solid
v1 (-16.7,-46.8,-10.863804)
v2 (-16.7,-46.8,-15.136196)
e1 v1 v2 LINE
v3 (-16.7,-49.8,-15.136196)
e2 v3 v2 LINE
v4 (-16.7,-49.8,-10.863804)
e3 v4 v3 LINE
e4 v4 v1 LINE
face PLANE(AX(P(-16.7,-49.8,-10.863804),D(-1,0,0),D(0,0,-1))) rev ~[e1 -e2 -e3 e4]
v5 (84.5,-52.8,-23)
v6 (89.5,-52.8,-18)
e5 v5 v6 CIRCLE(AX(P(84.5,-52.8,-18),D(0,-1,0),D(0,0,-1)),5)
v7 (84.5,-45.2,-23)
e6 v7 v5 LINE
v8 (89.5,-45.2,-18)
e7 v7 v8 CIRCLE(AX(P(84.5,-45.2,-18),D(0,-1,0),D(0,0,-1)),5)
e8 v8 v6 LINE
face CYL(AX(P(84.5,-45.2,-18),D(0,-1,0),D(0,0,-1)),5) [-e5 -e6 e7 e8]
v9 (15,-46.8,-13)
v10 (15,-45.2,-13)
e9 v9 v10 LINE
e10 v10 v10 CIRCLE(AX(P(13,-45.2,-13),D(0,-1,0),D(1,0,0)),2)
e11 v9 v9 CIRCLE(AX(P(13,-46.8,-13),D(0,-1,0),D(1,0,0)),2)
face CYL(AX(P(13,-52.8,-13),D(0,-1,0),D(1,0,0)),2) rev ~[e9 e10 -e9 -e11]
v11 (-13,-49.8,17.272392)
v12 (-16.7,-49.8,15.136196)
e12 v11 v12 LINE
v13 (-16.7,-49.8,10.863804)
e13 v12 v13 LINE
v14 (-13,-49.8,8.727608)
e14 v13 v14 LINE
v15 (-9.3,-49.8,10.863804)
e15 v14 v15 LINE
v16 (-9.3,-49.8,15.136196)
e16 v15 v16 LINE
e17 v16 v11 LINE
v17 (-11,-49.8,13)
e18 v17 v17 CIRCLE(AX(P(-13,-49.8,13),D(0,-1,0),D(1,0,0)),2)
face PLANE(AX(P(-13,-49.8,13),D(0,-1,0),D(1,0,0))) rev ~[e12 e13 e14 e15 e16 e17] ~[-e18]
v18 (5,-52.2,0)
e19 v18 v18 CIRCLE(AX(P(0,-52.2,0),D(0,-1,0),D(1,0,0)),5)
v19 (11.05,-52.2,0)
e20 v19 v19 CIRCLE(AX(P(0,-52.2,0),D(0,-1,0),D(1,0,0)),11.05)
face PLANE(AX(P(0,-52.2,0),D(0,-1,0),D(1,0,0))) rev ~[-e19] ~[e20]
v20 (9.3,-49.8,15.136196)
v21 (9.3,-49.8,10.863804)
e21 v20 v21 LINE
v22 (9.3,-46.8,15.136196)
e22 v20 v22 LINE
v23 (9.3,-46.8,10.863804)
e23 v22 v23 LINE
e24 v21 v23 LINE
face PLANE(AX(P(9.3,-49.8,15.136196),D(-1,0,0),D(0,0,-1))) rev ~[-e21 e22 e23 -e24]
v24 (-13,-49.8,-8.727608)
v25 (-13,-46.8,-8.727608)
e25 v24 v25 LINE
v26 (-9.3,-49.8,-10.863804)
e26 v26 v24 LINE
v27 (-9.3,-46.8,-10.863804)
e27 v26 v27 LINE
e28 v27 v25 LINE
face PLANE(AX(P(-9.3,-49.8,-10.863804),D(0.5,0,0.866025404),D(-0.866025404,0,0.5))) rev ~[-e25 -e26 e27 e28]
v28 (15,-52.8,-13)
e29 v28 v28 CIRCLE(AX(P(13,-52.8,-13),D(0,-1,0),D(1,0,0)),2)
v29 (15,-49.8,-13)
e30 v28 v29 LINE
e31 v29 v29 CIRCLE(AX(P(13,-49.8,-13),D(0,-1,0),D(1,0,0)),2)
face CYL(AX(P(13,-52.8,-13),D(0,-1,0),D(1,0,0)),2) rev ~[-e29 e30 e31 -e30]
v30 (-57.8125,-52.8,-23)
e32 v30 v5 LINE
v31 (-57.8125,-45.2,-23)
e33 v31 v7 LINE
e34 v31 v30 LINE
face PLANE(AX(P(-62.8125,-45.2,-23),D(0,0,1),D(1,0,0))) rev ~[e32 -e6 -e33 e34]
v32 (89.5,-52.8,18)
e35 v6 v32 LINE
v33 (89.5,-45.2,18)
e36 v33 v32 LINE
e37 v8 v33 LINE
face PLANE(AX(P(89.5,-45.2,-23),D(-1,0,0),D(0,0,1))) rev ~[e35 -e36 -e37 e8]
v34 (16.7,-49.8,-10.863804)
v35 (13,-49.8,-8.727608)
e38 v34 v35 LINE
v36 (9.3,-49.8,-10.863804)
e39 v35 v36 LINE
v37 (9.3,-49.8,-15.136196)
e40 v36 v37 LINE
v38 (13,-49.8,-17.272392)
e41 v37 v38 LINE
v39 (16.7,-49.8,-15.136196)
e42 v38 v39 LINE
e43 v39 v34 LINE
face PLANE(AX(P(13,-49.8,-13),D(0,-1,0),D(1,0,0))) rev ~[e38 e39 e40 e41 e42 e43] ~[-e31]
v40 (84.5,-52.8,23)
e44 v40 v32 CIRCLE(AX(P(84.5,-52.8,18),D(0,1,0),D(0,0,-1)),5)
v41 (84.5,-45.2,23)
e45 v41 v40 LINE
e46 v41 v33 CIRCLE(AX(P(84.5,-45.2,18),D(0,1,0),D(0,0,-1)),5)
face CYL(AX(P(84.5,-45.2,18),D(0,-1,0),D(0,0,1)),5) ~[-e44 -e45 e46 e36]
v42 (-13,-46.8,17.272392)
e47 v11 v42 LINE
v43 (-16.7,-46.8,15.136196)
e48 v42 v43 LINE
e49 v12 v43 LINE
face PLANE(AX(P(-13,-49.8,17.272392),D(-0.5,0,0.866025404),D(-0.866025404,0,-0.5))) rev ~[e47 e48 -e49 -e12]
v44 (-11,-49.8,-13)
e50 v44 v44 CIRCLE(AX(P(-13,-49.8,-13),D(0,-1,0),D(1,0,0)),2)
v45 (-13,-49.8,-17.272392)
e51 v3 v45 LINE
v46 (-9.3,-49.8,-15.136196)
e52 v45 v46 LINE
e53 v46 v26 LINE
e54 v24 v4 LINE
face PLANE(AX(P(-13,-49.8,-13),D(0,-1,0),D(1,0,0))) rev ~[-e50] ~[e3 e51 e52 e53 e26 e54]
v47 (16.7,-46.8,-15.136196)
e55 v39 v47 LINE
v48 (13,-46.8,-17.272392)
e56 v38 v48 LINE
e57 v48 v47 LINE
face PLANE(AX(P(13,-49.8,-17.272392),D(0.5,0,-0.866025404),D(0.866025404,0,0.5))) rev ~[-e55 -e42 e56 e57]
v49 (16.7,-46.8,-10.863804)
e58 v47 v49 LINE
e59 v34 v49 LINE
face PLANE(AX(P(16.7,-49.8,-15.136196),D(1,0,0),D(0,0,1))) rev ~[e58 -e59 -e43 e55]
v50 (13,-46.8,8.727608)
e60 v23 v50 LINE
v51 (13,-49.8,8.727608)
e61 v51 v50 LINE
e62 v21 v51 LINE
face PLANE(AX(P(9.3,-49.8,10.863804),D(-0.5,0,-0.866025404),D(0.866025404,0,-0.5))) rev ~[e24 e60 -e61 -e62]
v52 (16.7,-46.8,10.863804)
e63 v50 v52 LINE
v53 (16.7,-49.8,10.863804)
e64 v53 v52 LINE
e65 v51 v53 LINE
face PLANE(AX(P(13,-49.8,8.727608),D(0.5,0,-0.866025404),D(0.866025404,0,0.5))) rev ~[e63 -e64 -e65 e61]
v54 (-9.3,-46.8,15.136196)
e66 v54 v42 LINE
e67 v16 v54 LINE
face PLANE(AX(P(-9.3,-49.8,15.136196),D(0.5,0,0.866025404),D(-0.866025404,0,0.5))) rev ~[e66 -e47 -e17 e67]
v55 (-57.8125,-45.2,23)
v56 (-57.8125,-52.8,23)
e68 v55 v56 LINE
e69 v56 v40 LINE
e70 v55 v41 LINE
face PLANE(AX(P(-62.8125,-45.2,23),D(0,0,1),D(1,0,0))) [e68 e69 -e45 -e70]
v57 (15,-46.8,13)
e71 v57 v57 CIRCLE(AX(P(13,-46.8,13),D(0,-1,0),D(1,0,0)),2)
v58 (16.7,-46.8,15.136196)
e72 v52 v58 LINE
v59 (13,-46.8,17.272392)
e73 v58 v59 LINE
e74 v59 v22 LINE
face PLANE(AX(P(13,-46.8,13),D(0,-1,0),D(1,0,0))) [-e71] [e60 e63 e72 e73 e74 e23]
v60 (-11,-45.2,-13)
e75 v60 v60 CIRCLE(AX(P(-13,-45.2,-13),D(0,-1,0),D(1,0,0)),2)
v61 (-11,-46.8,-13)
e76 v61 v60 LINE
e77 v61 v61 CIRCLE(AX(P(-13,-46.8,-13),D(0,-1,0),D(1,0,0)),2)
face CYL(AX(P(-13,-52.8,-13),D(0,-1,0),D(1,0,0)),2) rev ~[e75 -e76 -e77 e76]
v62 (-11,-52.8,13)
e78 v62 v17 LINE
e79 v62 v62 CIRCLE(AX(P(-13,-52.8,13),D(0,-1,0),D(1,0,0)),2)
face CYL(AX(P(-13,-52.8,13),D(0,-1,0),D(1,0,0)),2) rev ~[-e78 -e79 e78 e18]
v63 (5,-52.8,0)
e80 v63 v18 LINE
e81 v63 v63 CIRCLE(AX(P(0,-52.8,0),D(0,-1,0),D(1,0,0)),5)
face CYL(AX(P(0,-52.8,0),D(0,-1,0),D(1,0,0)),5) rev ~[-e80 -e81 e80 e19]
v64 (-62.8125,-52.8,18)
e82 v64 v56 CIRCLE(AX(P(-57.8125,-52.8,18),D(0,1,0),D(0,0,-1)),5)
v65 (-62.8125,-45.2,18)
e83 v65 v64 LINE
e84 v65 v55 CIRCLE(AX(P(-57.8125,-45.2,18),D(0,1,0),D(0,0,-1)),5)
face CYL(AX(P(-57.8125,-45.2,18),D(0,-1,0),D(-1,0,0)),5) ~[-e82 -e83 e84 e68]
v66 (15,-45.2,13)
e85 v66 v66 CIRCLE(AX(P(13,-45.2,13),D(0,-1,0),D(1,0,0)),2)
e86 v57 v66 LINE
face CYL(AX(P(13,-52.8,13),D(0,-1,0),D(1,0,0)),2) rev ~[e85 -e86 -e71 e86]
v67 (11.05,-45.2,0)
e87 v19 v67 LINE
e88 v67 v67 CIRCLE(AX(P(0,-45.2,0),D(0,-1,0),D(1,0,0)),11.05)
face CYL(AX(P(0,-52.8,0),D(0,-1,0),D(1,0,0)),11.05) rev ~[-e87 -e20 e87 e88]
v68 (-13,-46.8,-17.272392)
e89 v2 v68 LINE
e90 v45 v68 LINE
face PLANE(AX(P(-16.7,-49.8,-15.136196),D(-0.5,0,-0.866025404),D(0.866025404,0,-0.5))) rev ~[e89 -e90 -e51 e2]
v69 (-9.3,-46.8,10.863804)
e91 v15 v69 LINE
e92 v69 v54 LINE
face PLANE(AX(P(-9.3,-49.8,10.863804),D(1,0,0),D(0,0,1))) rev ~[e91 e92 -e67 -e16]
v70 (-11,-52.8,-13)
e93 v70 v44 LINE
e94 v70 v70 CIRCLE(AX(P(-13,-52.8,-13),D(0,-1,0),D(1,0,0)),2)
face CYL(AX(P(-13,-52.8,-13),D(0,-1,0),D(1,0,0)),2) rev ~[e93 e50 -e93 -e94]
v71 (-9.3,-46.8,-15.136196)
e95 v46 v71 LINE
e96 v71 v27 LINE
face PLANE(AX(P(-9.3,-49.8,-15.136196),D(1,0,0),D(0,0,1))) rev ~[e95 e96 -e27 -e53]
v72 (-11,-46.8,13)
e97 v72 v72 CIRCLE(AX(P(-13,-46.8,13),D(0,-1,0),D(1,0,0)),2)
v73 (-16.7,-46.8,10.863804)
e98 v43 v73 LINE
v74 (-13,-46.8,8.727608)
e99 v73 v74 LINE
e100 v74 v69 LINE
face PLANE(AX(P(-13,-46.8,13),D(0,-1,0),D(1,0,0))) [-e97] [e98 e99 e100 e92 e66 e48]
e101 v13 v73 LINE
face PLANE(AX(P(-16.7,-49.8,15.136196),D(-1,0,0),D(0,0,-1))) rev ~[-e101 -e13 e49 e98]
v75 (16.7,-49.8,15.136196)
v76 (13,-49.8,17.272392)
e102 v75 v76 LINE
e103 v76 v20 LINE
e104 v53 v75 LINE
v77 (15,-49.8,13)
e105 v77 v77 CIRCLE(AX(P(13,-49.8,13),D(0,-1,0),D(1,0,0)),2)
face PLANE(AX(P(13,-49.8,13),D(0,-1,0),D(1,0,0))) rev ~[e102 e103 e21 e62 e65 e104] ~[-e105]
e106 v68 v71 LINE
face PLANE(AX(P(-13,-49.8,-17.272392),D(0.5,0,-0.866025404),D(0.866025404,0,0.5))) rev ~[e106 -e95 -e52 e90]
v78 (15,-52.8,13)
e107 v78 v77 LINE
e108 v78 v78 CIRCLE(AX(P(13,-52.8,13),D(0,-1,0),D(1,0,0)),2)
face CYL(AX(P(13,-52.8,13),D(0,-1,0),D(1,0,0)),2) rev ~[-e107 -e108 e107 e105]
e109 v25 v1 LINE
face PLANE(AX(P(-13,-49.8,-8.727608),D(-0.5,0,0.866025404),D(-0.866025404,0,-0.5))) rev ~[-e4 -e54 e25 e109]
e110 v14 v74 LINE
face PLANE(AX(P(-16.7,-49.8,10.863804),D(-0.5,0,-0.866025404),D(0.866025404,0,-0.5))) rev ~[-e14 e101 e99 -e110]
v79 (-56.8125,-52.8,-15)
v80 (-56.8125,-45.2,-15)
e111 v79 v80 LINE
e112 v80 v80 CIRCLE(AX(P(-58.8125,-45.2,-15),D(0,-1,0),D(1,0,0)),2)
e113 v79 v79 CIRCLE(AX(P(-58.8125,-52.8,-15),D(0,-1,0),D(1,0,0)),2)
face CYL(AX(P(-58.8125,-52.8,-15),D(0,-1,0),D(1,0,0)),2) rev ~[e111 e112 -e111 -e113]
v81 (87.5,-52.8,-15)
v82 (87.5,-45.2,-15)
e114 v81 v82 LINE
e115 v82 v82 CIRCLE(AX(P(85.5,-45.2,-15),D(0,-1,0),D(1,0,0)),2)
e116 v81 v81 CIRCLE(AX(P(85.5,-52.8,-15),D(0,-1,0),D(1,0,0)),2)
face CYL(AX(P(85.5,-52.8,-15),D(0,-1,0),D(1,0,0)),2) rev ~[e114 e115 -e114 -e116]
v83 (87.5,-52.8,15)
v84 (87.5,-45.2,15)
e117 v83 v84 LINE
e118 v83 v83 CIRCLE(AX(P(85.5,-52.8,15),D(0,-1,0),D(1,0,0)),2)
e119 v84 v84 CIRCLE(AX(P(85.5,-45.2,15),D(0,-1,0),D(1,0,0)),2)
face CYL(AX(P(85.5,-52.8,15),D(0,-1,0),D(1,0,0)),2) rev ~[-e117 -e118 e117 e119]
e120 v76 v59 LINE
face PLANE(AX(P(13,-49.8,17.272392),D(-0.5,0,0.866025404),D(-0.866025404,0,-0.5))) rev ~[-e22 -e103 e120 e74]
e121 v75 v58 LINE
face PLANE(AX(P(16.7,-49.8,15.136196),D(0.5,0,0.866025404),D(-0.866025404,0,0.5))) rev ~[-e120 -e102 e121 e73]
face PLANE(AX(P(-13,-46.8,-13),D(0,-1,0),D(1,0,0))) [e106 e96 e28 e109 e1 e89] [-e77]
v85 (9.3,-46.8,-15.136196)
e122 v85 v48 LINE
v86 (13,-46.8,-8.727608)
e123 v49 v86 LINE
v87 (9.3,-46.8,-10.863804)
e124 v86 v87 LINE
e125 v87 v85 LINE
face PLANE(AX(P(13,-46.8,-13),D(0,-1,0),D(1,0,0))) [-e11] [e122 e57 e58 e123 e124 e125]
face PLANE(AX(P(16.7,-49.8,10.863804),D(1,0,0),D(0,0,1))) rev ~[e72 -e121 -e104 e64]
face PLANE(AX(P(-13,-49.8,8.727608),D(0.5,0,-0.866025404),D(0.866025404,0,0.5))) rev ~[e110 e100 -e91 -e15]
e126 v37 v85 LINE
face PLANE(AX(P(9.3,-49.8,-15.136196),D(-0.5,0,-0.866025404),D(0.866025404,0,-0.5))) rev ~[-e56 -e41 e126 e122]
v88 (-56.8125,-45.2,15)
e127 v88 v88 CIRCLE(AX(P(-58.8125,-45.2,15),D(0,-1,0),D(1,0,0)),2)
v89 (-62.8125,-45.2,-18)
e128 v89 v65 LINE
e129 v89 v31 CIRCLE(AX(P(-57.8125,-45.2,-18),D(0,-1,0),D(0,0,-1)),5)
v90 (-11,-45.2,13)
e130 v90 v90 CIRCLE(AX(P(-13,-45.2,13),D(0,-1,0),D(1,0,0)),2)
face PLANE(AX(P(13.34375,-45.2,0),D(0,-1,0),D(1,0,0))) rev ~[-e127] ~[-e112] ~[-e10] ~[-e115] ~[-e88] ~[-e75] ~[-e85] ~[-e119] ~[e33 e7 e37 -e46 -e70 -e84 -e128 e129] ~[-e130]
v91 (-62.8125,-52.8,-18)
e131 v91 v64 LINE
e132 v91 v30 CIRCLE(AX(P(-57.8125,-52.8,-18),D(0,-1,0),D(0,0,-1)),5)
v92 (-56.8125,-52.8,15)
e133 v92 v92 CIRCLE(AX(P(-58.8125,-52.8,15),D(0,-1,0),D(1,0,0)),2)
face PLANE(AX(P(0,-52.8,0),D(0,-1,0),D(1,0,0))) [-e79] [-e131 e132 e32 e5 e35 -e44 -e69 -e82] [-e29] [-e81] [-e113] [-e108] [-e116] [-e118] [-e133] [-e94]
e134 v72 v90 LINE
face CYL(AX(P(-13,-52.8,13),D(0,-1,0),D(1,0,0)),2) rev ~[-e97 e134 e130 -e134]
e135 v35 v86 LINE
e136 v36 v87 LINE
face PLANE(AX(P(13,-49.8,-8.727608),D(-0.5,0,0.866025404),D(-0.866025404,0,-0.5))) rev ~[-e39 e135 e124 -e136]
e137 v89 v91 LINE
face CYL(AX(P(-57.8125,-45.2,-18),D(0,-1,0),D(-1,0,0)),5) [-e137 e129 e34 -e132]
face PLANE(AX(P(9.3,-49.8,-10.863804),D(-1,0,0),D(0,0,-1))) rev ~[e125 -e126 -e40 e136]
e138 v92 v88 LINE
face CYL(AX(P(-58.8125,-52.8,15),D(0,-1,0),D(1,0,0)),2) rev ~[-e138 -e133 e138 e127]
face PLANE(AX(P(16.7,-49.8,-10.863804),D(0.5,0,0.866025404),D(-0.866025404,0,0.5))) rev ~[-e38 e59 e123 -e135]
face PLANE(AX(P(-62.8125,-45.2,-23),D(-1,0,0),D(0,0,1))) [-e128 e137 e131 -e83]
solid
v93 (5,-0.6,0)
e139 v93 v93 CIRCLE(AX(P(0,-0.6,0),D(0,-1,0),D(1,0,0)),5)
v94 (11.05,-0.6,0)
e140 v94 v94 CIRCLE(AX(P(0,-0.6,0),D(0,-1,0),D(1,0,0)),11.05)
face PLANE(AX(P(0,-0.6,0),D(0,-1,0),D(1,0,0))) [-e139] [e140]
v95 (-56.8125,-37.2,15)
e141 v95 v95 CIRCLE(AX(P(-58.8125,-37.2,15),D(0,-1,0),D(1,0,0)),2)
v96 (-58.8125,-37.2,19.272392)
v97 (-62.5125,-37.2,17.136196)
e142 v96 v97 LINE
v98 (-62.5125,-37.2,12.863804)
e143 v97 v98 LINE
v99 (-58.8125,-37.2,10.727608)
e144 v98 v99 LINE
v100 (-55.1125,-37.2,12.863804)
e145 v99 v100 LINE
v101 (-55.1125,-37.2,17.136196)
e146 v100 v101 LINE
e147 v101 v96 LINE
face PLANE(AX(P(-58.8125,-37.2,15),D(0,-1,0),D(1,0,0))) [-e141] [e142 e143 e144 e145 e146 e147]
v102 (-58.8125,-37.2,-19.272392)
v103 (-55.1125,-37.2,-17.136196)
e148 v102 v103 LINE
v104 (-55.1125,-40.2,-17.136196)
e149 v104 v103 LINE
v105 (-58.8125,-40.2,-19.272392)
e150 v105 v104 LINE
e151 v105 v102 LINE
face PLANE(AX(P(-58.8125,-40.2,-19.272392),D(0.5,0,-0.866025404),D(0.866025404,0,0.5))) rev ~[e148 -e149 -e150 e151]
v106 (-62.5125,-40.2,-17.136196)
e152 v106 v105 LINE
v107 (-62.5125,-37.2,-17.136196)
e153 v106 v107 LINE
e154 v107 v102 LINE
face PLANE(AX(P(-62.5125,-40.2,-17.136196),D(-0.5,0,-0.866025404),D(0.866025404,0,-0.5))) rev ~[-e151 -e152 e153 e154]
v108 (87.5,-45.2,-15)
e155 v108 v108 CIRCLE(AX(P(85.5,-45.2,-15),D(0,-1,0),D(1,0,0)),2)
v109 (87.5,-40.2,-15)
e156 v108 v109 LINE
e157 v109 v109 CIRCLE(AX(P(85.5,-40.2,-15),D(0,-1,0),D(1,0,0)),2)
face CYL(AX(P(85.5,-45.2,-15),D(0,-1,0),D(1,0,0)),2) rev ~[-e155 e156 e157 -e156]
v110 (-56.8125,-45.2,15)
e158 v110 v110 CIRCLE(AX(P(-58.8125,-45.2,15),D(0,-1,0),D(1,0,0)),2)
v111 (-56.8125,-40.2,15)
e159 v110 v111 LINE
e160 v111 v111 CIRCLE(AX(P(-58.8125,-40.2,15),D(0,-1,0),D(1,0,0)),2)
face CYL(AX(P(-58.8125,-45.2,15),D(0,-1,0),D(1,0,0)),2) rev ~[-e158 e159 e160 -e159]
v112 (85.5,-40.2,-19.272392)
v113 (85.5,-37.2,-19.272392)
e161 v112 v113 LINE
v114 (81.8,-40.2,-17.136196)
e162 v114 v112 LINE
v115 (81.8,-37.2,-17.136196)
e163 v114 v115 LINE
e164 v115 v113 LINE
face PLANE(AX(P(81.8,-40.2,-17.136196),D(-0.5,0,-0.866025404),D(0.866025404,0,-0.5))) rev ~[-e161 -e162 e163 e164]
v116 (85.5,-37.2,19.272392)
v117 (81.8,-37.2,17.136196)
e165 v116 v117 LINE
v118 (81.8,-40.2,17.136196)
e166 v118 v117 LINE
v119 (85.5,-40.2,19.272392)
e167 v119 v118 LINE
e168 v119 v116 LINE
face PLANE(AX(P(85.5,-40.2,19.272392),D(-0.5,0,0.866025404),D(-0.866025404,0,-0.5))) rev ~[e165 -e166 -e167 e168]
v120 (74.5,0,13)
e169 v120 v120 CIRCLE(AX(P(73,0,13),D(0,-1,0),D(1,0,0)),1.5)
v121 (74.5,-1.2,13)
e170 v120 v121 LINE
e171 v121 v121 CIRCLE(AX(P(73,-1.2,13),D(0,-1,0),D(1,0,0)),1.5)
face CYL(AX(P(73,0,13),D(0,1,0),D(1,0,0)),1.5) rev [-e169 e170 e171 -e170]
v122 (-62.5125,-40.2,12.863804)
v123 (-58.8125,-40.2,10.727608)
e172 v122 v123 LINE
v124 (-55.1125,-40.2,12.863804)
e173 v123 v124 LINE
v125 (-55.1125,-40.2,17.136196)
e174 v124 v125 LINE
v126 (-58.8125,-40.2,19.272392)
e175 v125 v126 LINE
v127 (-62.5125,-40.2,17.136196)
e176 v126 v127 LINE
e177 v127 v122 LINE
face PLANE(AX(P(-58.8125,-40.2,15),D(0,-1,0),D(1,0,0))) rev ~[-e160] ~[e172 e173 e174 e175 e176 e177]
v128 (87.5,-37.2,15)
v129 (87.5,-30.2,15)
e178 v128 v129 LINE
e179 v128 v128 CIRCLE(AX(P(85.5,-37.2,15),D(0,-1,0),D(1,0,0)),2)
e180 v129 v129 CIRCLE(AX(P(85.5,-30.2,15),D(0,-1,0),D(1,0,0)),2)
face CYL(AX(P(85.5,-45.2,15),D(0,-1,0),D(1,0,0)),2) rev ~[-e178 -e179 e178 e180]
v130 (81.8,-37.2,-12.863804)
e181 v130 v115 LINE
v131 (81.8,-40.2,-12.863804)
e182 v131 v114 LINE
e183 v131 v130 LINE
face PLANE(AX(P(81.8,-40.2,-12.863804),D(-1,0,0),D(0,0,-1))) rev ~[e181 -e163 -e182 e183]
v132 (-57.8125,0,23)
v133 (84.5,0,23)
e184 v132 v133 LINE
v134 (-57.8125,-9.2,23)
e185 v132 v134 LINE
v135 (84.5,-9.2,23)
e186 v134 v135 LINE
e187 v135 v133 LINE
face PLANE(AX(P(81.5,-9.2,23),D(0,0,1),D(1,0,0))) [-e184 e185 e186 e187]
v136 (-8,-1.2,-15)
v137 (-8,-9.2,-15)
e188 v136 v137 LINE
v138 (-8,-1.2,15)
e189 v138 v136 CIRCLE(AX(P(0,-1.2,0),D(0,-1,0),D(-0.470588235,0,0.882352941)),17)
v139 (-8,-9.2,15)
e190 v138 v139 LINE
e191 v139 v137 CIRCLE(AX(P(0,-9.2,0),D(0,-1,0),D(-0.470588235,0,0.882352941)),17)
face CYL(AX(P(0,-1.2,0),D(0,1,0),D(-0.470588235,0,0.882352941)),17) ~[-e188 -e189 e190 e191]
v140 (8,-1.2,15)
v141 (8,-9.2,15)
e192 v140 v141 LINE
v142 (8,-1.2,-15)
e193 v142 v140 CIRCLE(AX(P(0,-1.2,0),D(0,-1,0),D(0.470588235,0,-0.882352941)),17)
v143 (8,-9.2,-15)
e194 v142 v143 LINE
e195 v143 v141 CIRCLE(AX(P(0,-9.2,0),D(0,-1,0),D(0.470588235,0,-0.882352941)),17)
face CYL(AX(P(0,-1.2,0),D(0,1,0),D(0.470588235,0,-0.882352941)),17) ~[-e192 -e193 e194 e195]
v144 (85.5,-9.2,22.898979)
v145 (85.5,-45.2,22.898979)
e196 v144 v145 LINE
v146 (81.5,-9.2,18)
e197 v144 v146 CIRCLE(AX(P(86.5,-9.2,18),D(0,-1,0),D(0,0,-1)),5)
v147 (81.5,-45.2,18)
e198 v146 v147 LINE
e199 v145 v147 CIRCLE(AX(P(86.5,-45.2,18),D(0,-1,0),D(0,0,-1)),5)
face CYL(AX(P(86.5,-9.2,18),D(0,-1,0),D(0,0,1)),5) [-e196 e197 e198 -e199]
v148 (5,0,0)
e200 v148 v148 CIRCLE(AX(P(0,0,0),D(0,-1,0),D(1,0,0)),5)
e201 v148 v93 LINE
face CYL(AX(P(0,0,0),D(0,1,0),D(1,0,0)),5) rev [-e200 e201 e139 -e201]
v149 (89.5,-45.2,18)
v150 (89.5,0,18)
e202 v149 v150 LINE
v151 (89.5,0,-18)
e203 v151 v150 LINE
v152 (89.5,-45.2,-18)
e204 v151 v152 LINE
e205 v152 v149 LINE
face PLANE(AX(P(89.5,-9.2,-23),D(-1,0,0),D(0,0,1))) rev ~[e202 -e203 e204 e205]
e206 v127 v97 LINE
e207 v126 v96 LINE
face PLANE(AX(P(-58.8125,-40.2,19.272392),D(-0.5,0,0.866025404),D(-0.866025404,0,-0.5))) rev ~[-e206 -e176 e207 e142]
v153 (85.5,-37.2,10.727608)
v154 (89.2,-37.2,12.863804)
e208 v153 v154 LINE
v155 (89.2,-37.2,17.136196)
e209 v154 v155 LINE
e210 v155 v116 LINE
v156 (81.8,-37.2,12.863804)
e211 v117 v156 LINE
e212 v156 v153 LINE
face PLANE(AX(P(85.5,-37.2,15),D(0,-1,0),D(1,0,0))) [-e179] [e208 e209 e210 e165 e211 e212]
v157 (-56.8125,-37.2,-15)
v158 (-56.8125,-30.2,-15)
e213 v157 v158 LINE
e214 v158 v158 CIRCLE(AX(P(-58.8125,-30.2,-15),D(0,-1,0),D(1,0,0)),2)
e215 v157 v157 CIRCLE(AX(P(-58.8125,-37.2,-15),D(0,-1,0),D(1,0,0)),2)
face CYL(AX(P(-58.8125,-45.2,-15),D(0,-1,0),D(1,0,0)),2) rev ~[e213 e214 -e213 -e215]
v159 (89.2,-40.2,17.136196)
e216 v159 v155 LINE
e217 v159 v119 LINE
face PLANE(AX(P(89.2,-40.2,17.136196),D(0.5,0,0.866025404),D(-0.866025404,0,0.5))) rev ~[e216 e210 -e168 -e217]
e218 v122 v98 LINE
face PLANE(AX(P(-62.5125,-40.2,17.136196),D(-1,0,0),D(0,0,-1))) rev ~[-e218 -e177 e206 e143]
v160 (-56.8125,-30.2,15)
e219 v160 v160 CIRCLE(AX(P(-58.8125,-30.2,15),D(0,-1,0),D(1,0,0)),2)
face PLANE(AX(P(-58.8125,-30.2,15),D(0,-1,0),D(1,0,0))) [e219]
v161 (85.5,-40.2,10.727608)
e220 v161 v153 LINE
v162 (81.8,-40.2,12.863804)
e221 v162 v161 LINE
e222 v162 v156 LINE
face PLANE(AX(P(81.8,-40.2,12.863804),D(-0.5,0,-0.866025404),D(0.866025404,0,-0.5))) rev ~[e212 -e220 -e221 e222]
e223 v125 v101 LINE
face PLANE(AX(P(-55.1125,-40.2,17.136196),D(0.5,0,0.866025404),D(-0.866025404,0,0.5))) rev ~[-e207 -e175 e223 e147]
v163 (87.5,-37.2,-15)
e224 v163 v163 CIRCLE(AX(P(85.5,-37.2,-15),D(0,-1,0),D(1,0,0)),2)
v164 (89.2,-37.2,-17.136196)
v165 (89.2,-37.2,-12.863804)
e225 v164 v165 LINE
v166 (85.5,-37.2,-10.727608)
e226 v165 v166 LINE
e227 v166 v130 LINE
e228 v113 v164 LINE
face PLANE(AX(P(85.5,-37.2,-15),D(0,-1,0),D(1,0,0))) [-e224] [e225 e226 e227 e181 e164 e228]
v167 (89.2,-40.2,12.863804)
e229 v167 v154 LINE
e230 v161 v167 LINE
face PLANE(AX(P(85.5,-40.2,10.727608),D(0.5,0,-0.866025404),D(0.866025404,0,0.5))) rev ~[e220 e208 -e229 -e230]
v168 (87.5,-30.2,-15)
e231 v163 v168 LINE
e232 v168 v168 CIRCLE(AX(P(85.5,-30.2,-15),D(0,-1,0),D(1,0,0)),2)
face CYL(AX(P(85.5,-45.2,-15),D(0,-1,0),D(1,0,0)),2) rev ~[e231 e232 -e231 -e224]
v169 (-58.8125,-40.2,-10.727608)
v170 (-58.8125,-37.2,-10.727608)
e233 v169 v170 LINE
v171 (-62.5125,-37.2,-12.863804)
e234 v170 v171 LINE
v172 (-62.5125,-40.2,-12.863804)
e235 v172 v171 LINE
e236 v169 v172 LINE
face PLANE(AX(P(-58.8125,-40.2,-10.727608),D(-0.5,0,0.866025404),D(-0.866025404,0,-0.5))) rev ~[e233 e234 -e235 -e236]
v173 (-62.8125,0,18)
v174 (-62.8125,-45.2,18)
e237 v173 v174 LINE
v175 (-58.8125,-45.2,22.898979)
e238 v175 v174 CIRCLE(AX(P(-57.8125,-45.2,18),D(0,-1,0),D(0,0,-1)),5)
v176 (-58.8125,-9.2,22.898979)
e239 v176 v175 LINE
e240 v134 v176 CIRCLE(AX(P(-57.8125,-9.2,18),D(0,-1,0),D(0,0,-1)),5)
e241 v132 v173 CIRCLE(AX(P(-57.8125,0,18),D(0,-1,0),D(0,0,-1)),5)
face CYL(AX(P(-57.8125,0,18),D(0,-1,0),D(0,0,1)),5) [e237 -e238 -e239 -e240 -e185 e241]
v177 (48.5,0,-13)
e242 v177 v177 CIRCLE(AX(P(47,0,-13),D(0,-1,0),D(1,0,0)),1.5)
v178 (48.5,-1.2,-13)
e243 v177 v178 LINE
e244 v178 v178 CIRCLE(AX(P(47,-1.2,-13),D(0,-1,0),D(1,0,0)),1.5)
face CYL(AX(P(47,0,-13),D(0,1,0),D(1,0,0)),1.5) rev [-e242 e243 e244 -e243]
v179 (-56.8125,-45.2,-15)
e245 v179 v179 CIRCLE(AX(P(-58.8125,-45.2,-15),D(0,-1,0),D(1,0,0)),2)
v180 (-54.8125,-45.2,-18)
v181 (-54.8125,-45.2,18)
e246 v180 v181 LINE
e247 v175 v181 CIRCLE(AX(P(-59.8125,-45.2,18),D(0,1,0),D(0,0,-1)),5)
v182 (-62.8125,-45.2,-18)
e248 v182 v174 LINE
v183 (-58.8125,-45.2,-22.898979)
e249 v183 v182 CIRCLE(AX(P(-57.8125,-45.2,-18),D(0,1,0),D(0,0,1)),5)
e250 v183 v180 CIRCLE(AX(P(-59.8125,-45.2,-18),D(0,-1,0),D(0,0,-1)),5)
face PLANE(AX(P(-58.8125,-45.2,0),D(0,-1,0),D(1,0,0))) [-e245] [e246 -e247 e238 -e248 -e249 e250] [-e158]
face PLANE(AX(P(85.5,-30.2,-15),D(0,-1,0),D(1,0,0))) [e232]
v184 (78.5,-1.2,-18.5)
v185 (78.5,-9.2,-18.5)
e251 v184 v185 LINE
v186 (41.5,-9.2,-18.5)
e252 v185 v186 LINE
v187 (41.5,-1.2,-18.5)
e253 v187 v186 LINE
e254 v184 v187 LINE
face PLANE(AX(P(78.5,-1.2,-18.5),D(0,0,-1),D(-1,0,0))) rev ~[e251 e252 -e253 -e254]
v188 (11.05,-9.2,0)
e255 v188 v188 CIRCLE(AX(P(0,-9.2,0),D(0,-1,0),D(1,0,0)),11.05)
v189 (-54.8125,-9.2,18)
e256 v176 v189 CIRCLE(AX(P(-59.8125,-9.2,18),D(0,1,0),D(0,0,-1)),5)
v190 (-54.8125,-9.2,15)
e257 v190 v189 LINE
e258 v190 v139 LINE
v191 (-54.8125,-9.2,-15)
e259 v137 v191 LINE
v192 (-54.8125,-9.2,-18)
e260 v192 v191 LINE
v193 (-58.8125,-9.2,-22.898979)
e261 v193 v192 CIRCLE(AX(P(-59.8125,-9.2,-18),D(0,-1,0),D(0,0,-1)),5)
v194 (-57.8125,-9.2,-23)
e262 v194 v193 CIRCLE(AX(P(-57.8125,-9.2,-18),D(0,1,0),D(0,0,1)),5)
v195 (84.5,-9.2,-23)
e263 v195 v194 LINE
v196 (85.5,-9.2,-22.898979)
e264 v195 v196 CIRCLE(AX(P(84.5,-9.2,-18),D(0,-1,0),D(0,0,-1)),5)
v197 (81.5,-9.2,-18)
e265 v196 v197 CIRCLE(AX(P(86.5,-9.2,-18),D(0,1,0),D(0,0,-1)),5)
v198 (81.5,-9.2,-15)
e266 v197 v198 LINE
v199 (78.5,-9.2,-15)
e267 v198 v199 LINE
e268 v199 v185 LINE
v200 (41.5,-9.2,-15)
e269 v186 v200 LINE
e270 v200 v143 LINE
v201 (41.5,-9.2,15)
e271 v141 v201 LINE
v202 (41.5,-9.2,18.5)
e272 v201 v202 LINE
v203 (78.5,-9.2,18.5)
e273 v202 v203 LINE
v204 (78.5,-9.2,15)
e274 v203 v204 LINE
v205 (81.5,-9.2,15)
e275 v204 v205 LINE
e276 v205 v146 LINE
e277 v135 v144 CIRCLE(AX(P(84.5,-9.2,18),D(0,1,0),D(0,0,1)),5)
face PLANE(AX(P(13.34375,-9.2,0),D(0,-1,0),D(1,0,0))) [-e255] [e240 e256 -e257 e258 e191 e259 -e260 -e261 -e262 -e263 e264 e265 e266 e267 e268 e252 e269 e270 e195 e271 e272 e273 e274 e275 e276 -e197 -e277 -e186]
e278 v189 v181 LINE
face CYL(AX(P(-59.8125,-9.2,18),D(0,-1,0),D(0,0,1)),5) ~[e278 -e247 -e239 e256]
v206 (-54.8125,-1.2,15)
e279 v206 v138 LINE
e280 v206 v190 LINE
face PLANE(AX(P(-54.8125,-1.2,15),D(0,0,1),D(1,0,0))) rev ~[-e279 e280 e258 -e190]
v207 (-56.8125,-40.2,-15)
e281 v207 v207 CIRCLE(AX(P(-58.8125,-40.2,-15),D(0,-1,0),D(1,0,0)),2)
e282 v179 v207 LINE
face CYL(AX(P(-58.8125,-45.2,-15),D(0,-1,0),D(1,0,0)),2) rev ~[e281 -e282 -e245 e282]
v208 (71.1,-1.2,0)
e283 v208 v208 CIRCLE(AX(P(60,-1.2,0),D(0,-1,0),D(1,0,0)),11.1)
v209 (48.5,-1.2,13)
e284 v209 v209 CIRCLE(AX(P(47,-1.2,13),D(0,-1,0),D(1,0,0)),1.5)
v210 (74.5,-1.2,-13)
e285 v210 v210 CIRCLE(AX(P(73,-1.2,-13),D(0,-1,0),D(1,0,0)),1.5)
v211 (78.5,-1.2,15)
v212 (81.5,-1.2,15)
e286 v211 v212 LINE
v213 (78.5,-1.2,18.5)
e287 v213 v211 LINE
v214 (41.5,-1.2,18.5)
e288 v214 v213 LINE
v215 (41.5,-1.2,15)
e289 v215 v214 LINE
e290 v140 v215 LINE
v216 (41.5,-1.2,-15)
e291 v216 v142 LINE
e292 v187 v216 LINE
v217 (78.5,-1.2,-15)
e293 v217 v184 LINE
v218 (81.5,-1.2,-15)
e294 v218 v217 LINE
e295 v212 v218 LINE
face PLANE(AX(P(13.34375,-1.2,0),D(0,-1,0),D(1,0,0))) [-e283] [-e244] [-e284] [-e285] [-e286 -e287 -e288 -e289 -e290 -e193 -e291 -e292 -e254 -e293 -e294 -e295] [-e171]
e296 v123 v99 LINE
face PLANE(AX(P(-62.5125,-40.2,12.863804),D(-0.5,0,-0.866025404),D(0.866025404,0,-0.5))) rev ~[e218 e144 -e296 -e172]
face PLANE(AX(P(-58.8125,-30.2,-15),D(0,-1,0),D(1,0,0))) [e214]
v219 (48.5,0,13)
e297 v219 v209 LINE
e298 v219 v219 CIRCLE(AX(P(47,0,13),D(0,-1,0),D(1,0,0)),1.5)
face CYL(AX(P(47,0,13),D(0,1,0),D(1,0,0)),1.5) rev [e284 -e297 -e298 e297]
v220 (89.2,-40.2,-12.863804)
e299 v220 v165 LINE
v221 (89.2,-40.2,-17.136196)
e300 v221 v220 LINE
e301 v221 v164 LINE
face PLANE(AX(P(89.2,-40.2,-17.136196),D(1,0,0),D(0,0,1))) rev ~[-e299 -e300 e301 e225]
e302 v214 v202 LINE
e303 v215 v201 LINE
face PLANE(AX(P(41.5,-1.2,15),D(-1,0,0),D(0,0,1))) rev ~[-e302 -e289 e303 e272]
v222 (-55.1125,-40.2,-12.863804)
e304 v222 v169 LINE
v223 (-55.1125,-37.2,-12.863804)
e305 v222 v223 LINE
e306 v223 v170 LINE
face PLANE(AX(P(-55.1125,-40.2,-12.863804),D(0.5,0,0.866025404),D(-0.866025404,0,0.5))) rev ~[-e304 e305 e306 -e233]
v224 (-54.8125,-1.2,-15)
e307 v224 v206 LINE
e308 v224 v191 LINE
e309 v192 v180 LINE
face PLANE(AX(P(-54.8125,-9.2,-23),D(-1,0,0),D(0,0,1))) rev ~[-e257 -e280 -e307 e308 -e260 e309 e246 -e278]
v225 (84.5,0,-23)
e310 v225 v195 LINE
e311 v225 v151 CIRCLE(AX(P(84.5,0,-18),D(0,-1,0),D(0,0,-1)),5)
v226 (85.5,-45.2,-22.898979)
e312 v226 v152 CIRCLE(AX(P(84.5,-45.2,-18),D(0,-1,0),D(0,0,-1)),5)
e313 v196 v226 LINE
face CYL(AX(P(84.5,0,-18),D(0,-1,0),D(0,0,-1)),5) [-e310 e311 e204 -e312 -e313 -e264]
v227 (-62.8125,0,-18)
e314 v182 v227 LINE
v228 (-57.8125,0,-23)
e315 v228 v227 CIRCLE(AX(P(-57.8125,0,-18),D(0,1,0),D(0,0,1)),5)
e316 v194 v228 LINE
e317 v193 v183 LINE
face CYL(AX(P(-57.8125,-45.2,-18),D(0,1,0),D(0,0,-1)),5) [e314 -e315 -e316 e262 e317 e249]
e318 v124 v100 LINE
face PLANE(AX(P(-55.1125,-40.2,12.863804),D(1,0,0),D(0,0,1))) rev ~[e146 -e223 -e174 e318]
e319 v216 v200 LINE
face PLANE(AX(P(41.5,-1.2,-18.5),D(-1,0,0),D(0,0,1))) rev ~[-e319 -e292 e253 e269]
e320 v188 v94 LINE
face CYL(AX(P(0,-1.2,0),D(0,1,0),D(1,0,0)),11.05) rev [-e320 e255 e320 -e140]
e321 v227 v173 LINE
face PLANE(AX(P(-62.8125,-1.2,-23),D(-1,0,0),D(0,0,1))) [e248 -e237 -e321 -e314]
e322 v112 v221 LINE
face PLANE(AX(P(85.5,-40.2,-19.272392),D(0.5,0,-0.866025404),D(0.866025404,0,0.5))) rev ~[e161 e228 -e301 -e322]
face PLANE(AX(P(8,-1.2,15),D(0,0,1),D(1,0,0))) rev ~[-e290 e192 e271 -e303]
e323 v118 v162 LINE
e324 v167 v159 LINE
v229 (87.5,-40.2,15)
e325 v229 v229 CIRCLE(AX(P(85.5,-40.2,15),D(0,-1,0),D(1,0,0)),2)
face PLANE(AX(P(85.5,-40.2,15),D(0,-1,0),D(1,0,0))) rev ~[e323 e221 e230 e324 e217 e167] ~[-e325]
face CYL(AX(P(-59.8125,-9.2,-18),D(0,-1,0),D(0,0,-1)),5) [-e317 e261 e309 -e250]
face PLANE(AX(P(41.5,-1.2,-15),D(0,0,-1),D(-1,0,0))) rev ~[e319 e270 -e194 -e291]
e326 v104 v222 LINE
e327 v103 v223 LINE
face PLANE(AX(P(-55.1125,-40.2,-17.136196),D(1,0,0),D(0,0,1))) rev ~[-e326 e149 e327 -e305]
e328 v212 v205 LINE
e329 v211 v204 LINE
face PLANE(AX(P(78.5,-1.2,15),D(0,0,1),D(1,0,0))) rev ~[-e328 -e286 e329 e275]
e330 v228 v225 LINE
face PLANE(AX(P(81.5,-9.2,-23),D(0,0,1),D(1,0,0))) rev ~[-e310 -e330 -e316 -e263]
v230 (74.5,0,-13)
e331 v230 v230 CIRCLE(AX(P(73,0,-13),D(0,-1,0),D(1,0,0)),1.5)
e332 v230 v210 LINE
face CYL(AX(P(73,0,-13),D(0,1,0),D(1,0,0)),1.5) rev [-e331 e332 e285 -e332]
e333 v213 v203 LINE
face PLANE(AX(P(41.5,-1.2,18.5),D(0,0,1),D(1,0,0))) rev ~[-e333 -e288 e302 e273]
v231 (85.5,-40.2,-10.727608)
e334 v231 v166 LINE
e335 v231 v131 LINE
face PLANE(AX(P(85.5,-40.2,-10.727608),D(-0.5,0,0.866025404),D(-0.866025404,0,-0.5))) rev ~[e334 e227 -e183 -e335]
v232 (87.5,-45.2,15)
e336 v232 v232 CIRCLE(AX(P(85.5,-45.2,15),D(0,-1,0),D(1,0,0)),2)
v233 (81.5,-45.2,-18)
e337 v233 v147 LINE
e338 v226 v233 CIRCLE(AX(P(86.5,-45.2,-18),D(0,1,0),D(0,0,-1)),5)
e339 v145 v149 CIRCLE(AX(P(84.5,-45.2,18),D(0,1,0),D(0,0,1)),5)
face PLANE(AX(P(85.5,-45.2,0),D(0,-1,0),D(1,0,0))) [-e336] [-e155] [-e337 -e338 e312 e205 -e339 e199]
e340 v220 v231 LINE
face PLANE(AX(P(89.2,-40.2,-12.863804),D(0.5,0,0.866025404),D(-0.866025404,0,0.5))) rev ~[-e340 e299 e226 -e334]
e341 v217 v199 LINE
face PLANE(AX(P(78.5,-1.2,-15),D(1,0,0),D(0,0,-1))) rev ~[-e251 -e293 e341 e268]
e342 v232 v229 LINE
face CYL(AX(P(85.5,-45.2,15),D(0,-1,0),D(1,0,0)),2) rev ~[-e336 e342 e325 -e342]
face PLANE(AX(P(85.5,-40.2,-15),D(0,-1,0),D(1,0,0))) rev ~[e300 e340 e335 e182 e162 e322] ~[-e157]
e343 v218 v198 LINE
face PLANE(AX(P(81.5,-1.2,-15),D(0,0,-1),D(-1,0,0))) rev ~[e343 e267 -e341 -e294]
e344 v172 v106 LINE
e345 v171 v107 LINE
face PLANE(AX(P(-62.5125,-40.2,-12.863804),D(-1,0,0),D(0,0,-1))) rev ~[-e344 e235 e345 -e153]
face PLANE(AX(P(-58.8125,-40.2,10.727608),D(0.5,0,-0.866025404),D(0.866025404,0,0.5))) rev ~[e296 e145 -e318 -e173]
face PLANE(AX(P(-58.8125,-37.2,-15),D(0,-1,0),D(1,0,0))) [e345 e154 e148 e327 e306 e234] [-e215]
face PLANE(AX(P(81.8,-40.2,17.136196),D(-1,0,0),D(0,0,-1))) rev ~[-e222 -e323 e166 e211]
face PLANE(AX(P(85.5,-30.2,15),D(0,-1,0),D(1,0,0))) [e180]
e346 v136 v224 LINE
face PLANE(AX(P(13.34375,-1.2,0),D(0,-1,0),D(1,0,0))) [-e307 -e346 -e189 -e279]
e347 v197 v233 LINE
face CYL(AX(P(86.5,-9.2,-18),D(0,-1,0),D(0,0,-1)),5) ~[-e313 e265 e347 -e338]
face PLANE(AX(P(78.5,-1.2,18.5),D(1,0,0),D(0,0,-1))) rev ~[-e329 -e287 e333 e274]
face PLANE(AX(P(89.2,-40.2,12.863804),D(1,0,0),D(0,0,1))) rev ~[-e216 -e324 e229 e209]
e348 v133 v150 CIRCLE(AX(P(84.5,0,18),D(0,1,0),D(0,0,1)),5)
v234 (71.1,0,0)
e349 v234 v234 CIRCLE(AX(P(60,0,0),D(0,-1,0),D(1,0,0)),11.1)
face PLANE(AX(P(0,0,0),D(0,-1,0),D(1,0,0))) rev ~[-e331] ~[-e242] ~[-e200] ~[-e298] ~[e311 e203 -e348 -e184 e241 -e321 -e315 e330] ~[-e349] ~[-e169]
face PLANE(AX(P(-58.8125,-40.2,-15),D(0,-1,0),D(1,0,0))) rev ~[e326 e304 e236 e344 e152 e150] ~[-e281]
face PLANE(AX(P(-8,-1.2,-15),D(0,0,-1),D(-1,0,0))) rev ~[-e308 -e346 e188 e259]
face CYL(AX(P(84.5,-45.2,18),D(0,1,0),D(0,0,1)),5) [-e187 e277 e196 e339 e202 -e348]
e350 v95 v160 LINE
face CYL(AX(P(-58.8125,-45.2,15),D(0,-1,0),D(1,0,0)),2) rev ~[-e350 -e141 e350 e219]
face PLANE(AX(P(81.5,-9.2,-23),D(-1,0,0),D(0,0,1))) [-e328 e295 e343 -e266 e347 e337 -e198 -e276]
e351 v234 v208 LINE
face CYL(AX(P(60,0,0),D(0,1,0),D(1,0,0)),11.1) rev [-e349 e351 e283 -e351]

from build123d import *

# Parameters (mm, degrees)
F0_W       = 152.3125
F0_H       = 46
F0_R       = 1.5
F0_R_2     = 11.05
F0_R_3     = 11.1
F1_DEPTH   = 1.2
F2_W       = 152.3125
F2_H       = 46
F2_R       = 11.05
F3_DEPTH   = 8
F4_W       = 8
F4_H       = 46
F5_DEPTH   = 36
F6_W       = 152.3125
F6_H       = 46
F7_DEPTH   = 7.6
F0_R_4     = 5
F8_DEPTH   = 0.6
F9_R       = 11.05
F9_R_2     = 5
F9_R_3     = 2
F10_DEPTH  = 52.801
F11_DEPTH  = 0.6
F14_DEPTH  = 3
F15_R      = 2
F16_DEPTH  = 15
F19_DEPTH  = 3
F20_R      = 2
F21_DEPTH  = 52.801
F22_F1_R   = 5
F22_F2_R   = 5
F22_F3_R   = 5
F22_F4_R   = 5
F22_F5_R   = 5
F22_F6_R   = 5
F22_F7_R   = 5
F22_F8_R   = 5
F22_2_F1_R = 5
F22_2_F2_R = 5
F22_2_F3_R = 5
F22_2_F4_R = 5


with BuildPart() as f1:
    # F0 (on Front) → F1 (new body)
    with BuildSketch(Plane.XZ):
        with Locations((13.34375, 0)):
            Rectangle(F0_W, F0_H)
        with Locations((47, -13)):
            Circle(F0_R, mode=Mode.SUBTRACT)
        with Locations((73, -13)):
            Circle(F0_R, mode=Mode.SUBTRACT)
        Circle(F0_R_2, mode=Mode.SUBTRACT)
        with Locations((60, 0)):
            Circle(F0_R_3, mode=Mode.SUBTRACT)
        with Locations((47, 13)):
            Circle(F0_R, mode=Mode.SUBTRACT)
        with Locations((73, 13)):
            Circle(F0_R, mode=Mode.SUBTRACT)
    extrude(amount=F1_DEPTH)

    # F2 (on face) → F3 (join)
    with BuildSketch(Plane.XZ.offset(1.2)):
        with Locations((13.34375, 0)):
            Rectangle(F2_W, F2_H)
        with BuildLine():
            Line((-8, -15), (-54.8125, -15))
            Line((-54.8125, -15), (-54.8125, 15))
            Line((-54.8125, 15), (-8, 15))
            ThreePointArc((-8, 15), (-17, 0), (-8, -15))
        make_face(mode=Mode.SUBTRACT)
        Circle(F2_R, mode=Mode.SUBTRACT)
        with BuildLine():
            Line((78.5, 15), (81.5, 15))
            Line((81.5, 15), (81.5, -15))
            Line((81.5, -15), (78.5, -15))
            Line((78.5, -15), (78.5, -18.5))
            Line((78.5, -18.5), (41.5, -18.5))
            Line((41.5, -18.5), (41.5, -15))
            Line((41.5, -15), (8, -15))
            ThreePointArc((8, -15), (17, 0), (8, 15))
            Line((8, 15), (41.5, 15))
            Line((41.5, 15), (41.5, 18.5))
            Line((41.5, 18.5), (78.5, 18.5))
            Line((78.5, 18.5), (78.5, 15))
        make_face(mode=Mode.SUBTRACT)
    extrude(amount=F3_DEPTH)

    # F4 (on face) → F5 (join)
    with BuildSketch(Plane.XZ.offset(9.2)):
        with Locations((85.5, 0)):
            Rectangle(F4_W, F4_H)
        with Locations((-58.8125, 0)):
            Rectangle(F4_W, F4_H)
    extrude(amount=F5_DEPTH)

    # F0 (on Front) → F8 (join)
    with BuildSketch(Plane.XZ):
        Circle(F0_R_2)
        Circle(F0_R_4, mode=Mode.SUBTRACT)
    extrude(amount=F8_DEPTH)

    # F15 (on face) → F16 (cut)
    with BuildSketch(Plane.XZ.offset(45.2)):
        with Locations((85.5, 15)):
            Circle(F15_R)
        with Locations((85.5, -15)):
            Circle(F15_R)
        with Locations((-58.8125, 15)):
            Circle(F15_R)
        with Locations((-58.8125, -15)):
            Circle(F15_R)
    extrude(amount=-F16_DEPTH, mode=Mode.SUBTRACT)

    # F18 (on offset) → F19 (cut)
    with BuildSketch(Plane.XZ.offset(40.2)):
        Polygon((-55.1125, 12.863804004), (-55.1125, 17.136195996), (-58.8125, 19.272391992), (-62.5125, 17.136195996), (-62.5125, 12.863804004), (-58.8125, 10.727608008), align=None)
        Polygon((-55.1125, -17.136195996), (-55.1125, -12.863804004), (-58.8125, -10.727608008), (-62.5125, -12.863804004), (-62.5125, -17.136195996), (-58.8125, -19.272391992), align=None)
        Polygon((81.8, 17.136195996), (81.8, 12.863804004), (85.5, 10.727608008), (89.2, 12.863804004), (89.2, 17.136195996), (85.5, 19.272391992), align=None)
        Polygon((81.8, -12.863804004), (81.8, -17.136195996), (85.5, -19.272391992), (89.2, -17.136195996), (89.2, -12.863804004), (85.5, -10.727608008), align=None)
    extrude(amount=-F19_DEPTH, mode=Mode.SUBTRACT)

    # F22: fillet of radius 5 on 8 edges, made by hand

    # F22_f1
    f22_f1_edges = [f1.edges().sort_by_distance(p)[0] for p in [
        (81.5, -27.2, 23),
    ]]
    fillet(f22_f1_edges, radius=F22_F1_R)

    # F22_f2
    f22_f2_edges = [f1.edges().sort_by_distance(p)[0] for p in [
        (-54.8125, -27.2, 23),
    ]]
    fillet(f22_f2_edges, radius=F22_F2_R)

    # F22_f3
    f22_f3_edges = [f1.edges().sort_by_distance(p)[0] for p in [
        (81.5, -27.2, -23),
    ]]
    fillet(f22_f3_edges, radius=F22_F3_R)

    # F22_f4
    f22_f4_edges = [f1.edges().sort_by_distance(p)[0] for p in [
        (-54.8125, -27.2, -23),
    ]]
    fillet(f22_f4_edges, radius=F22_F4_R)

    # F22_f5
    f22_f5_edges = [f1.edges().sort_by_distance(p)[0] for p in [
        (89.5, -22.6, 23),
    ]]
    fillet(f22_f5_edges, radius=F22_F5_R)

    # F22_f6
    f22_f6_edges = [f1.edges().sort_by_distance(p)[0] for p in [
        (-62.8125, -22.6, 23),
    ]]
    fillet(f22_f6_edges, radius=F22_F6_R)

    # F22_f7
    f22_f7_edges = [f1.edges().sort_by_distance(p)[0] for p in [
        (89.5, -22.6, -23),
    ]]
    fillet(f22_f7_edges, radius=F22_F7_R)

    # F22_f8
    f22_f8_edges = [f1.edges().sort_by_distance(p)[0] for p in [
        (-62.8125, -22.6, -23),
    ]]
    fillet(f22_f8_edges, radius=F22_F8_R)


with BuildPart() as f7:
    # F6 (on face) → F7 (new body)
    with BuildSketch(Plane.XZ.offset(45.2)):
        with Locations((13.34375, 0)):
            Rectangle(F6_W, F6_H)
    extrude(amount=F7_DEPTH)

    # F9 (on face) → F10 (cut, through all)
    with BuildSketch(Plane.XZ.offset(52.8)):
        Circle(F9_R)
        Circle(F9_R_2, mode=Mode.SUBTRACT)
        with Locations((-13, -13)):
            Circle(F9_R_3)
        with Locations((13, -13)):
            Circle(F9_R_3)
        with Locations((13, 13)):
            Circle(F9_R_3)
        with Locations((-13, 13)):
            Circle(F9_R_3)
        Circle(F9_R_2)
    extrude(amount=-F10_DEPTH, mode=Mode.SUBTRACT)

    # F9 (on face) → F11 (join)
    with BuildSketch(Plane.XZ.offset(52.8)):
        Circle(F9_R)
        Circle(F9_R_2, mode=Mode.SUBTRACT)
    extrude(amount=-F11_DEPTH)

    # F13 (on offset) → F14 (cut)
    with BuildSketch(Plane.XZ.offset(49.8)):
        Polygon((-9.3, -15.136195996), (-9.3, -10.863804004), (-13, -8.727608008), (-16.7, -10.863804004), (-16.7, -15.136195996), (-13, -17.272391992), align=None)
        Polygon((-9.3, 10.863804004), (-9.3, 15.136195996), (-13, 17.272391992), (-16.7, 15.136195996), (-16.7, 10.863804004), (-13, 8.727608008), align=None)
        Polygon((9.3, 15.136195996), (9.3, 10.863804004), (13, 8.727608008), (16.7, 10.863804004), (16.7, 15.136195996), (13, 17.272391992), align=None)
        Polygon((9.3, -10.863804004), (9.3, -15.136195996), (13, -17.272391992), (16.7, -15.136195996), (16.7, -10.863804004), (13, -8.727608008), align=None)
    extrude(amount=-F14_DEPTH, mode=Mode.SUBTRACT)

    # F20 (on face) → F21 (cut, through all)
    with BuildSketch(Plane.XZ.offset(52.8)):
        with Locations((-58.8125, -15)):
            Circle(F20_R)
        with Locations((-58.8125, 15)):
            Circle(F20_R)
        with Locations((85.5, 15)):
            Circle(F20_R)
        with Locations((85.5, -15)):
            Circle(F20_R)
    extrude(amount=-F21_DEPTH, mode=Mode.SUBTRACT)

    # F22#2: fillet of radius 5 on 4 edges, made by hand

    # F22_2_f1
    f22_2_f1_edges = [f7.edges().sort_by_distance(p)[0] for p in [
        (-62.8125, -49, -23),
    ]]
    fillet(f22_2_f1_edges, radius=F22_2_F1_R)

    # F22_2_f2
    f22_2_f2_edges = [f7.edges().sort_by_distance(p)[0] for p in [
        (89.5, -49, -23),
    ]]
    fillet(f22_2_f2_edges, radius=F22_2_F2_R)

    # F22_2_f3
    f22_2_f3_edges = [f7.edges().sort_by_distance(p)[0] for p in [
        (-62.8125, -49, 23),
    ]]
    fillet(f22_2_f3_edges, radius=F22_2_F3_R)

    # F22_2_f4
    f22_2_f4_edges = [f7.edges().sort_by_distance(p)[0] for p in [
        (89.5, -49, 23),
    ]]
    fillet(f22_2_f4_edges, radius=F22_2_F4_R)


solid = Compound([f1.part, f7.part])
